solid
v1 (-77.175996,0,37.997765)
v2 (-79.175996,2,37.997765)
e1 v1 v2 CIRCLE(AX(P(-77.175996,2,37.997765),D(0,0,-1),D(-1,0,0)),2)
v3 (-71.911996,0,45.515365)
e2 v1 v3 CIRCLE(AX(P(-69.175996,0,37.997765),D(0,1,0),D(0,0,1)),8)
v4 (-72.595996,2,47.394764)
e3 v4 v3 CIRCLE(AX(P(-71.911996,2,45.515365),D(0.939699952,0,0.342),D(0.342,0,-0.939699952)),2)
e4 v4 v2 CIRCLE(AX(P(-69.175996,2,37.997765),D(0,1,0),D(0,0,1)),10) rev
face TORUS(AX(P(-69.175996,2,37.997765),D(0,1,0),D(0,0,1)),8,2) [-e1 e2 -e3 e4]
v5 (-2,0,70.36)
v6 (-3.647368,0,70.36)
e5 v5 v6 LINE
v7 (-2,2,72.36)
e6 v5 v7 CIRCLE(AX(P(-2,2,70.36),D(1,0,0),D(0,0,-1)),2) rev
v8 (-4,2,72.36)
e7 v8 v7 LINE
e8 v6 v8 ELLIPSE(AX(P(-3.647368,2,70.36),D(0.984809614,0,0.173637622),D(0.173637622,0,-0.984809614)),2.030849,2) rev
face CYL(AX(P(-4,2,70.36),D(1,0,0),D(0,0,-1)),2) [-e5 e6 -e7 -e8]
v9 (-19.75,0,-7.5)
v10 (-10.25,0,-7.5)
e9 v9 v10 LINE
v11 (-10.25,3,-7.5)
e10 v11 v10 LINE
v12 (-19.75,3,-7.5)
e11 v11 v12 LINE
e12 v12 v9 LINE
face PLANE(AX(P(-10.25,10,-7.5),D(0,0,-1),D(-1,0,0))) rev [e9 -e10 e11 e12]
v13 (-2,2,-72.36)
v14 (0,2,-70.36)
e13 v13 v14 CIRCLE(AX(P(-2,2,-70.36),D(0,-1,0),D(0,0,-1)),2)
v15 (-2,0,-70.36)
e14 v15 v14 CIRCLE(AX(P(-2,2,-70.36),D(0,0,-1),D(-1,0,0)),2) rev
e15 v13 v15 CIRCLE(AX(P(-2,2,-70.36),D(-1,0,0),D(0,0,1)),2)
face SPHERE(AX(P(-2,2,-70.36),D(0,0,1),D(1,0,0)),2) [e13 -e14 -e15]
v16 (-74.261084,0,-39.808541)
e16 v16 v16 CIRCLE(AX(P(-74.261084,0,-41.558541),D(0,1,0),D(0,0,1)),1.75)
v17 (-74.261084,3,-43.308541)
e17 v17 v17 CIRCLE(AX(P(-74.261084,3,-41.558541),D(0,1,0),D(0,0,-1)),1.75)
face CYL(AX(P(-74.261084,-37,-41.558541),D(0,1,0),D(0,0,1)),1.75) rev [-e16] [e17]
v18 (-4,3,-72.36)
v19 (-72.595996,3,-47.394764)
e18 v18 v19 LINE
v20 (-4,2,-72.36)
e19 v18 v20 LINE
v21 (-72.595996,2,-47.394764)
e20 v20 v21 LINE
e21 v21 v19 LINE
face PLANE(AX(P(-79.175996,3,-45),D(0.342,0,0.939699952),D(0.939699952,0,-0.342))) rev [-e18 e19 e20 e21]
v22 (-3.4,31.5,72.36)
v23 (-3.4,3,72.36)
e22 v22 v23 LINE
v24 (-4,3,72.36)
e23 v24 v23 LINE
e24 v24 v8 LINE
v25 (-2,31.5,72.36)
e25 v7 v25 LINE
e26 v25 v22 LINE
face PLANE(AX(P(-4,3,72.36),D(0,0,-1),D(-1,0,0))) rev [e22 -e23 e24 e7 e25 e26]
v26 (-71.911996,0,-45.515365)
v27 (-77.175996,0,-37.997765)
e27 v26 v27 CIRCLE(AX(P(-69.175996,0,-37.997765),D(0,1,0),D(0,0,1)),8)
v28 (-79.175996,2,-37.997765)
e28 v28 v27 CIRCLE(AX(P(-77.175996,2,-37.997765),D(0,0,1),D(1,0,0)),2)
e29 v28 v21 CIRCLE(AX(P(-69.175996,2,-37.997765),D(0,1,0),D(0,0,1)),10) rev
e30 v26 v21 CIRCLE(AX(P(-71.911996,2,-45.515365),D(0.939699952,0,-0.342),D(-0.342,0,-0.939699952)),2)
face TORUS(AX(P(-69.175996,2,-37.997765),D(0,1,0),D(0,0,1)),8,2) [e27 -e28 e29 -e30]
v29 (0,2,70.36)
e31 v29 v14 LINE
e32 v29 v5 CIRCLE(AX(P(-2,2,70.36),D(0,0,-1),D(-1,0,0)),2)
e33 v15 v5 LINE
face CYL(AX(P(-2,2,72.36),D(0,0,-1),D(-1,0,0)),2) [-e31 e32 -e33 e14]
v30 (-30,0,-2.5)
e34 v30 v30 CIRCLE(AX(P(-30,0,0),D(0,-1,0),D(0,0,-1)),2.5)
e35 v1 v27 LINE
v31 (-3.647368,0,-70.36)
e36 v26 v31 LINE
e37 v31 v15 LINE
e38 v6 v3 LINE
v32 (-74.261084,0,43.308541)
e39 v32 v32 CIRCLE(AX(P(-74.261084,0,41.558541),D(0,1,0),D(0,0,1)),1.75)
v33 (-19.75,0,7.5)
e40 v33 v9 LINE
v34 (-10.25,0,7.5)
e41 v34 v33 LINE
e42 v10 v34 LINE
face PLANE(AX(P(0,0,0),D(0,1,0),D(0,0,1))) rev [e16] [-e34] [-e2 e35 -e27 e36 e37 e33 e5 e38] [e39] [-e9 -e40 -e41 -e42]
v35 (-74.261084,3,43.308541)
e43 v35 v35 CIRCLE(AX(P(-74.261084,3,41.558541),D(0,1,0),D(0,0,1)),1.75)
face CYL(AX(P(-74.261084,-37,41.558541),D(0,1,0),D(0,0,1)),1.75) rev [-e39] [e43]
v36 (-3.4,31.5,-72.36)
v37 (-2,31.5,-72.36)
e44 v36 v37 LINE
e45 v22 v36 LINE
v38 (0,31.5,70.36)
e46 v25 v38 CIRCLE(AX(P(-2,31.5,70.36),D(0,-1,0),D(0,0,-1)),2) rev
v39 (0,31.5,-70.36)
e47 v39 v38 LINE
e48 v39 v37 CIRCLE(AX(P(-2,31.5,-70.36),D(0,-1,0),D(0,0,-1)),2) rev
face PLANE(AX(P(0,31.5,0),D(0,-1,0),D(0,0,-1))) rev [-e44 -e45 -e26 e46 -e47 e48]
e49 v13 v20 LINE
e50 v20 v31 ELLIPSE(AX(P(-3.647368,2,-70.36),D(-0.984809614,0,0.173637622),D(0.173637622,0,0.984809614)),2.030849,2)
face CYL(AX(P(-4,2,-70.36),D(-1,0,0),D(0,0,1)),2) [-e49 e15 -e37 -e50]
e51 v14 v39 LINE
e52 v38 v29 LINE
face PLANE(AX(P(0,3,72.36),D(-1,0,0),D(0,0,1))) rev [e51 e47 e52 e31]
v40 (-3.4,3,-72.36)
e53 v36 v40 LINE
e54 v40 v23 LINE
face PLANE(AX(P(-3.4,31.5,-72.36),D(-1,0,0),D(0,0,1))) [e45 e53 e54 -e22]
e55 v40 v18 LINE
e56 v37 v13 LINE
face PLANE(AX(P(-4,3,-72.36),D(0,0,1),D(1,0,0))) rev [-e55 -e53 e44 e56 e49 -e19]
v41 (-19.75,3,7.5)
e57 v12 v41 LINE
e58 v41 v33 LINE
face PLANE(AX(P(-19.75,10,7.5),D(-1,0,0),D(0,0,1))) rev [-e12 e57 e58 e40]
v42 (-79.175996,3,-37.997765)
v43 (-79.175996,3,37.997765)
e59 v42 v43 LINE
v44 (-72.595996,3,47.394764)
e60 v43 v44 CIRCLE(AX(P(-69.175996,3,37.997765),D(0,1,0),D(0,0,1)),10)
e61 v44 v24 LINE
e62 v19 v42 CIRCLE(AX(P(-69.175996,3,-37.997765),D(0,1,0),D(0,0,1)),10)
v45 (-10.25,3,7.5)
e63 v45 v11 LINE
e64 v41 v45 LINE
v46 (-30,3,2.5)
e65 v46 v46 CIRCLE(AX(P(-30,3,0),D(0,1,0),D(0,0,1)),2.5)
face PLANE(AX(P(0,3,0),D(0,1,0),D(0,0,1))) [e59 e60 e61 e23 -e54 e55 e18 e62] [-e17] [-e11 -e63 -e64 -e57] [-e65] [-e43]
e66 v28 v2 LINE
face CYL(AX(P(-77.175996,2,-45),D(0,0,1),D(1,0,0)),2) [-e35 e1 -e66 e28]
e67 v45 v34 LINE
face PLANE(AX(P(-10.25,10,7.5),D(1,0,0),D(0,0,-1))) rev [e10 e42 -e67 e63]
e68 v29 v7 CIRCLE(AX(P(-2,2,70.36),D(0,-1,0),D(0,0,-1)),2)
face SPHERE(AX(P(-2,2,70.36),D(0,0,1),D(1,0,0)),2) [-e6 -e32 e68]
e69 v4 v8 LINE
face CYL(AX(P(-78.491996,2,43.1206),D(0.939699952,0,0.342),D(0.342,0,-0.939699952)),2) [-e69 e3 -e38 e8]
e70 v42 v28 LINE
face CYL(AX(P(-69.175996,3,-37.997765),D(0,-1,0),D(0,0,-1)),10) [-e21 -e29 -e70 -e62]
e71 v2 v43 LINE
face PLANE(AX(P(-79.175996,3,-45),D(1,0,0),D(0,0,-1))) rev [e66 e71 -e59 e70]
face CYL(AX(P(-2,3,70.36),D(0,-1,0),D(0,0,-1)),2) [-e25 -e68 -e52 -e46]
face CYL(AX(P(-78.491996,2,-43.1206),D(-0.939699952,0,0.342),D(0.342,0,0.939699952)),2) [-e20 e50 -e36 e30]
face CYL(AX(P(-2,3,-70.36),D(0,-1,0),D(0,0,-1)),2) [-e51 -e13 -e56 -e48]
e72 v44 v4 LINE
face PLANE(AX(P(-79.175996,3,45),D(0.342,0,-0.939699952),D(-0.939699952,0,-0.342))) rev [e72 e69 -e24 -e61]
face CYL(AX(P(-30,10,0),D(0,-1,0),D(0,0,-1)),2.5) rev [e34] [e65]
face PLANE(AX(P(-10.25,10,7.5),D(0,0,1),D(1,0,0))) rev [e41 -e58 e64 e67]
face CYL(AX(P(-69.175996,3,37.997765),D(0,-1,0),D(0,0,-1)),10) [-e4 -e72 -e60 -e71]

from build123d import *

# Parameters (mm, degrees)
BOSS_EXTRUDE1_DEPTH     = 3
SKETCH2_W               = 3.3999999999999995
SKETCH2_H               = 144.72
BOSS_EXTRUDE2_DEPTH     = 31.5
SKETCH3_R               = 1.749999999999997
CUT_EXTRUDE1_DEPTH      = 40
FILLET1_R               = 2
FILLET2_R               = 2
CONG_1_R                = 10
ESQUISSE2_R             = 2.500000000000002
ENL_V_MAT_EXTRU_1_DEPTH = 10


with BuildPart() as part:
    # Sketch1 → Boss-Extrude1 (new body)
    with BuildSketch(Plane(origin=(0, 0, 0), x_dir=(1, 0, 0), z_dir=(0, 1, 0))):
        Polygon((-79.17599616899001, 45), (-79.17599616899001, -45), (-4, -72.36), (0, -72.36), (0, 72.36), (-4, 72.36), align=None)
    extrude(amount=BOSS_EXTRUDE1_DEPTH)

    # Sketch2 → Boss-Extrude2 (add)
    with BuildSketch(Plane.XZ):
        with Locations((-1.6999999999999997, 0)):
            Rectangle(SKETCH2_W, SKETCH2_H)
    extrude(amount=-BOSS_EXTRUDE2_DEPTH)

    # Sketch3 → Cut-Extrude1 (cut)
    with BuildSketch(Plane(origin=(0, 3, 0), x_dir=(1, 0, 0), z_dir=(0, 1, 0))):
        with Locations(Location((-74.2610839032561, -41.5585413818937, 0), (0, 0, 270))):
            Circle(SKETCH3_R)
        with Locations(Location((-74.26108390325611, 41.55854138189368, 0), (0, 0, 270))):
            Circle(SKETCH3_R)
    extrude(amount=-CUT_EXTRUDE1_DEPTH, mode=Mode.SUBTRACT)

    # Fillet1
    fillet1_edges = [part.edges().sort_by_distance(p)[0] for p in [
        (-2, 0, -72.36),
        (0, 0, 0),
        (-2, 0, 72.36),
        (-41.587998084495005, 0, 58.68),
        (-79.17599616899001, 0, 0),
        (-41.587998084495005, 0, -58.68),
    ]]
    fillet(fillet1_edges, radius=FILLET1_R)

    # Fillet2
    # the kernel refuses this fillet: 2 mm, written as the material it takes off along each edge
    with BuildSketch(Plane(origin=(-2, 2, -70.36), x_dir=(1, 0, 0), z_dir=(0, 0, -1))) as fillet2_piece_1_section:
        Polygon((0, 0), (FILLET2_R, 0), (FILLET2_R, FILLET2_R), (0, FILLET2_R), align=None)
    fillet2_piece_1 = extrude(amount=FILLET2_R, mode=Mode.PRIVATE)
    fillet2_piece_1 = fillet2_piece_1 - Plane(origin=(-2, 2, -70.36), x_dir=(-0.7071067811865475, 0.7071067811865475, 0), z_dir=(0, 0, -1)) * Sphere(FILLET2_R, mode=Mode.PRIVATE)
    add(fillet2_piece_1, mode=Mode.SUBTRACT)
    with BuildSketch(Plane(origin=(-2, 2, 70.36), x_dir=(1, 0, 0), z_dir=(0, 0, 1))) as fillet2_piece_2_section:
        Polygon((0, 0), (FILLET2_R, 0), (FILLET2_R, -FILLET2_R), (0, -FILLET2_R), align=None)
    fillet2_piece_2 = extrude(amount=FILLET2_R, mode=Mode.PRIVATE)
    fillet2_piece_2 = fillet2_piece_2 - Plane(origin=(-2, 2, 70.36), x_dir=(-0.7071067811865475, 0.7071067811865475, 0), z_dir=(0, 0, 1)) * Sphere(FILLET2_R, mode=Mode.PRIVATE)
    add(fillet2_piece_2, mode=Mode.SUBTRACT)
    with BuildSketch(Plane(origin=(0, 36.5, -72.36), x_dir=(-1, 0, 0), z_dir=(0, -1, 0))) as fillet2_piece_3:
        with BuildLine():
            CenterArc((FILLET2_R, -FILLET2_R), FILLET2_R, 90, 90)
            Line((-2.2e-16, -FILLET2_R), (0, 0))
            Line((0, 0), (FILLET2_R, 0))
        make_face()
    extrude(amount=34.5, mode=Mode.SUBTRACT)
    with BuildSketch(Plane(origin=(0, 1.9999999999999993, 72.36), x_dir=(-1, 0, 0), z_dir=(0, 1, 0))) as fillet2_piece_4:
        with BuildLine():
            CenterArc((FILLET2_R, -FILLET2_R), FILLET2_R, 90, 90)
            Line((0, -FILLET2_R), (0, 0))
            Line((0, 0), (FILLET2_R, 0))
        make_face()
    extrude(amount=34.5, mode=Mode.SUBTRACT)

    # Congé1
    # the kernel refuses this fillet: 10 mm, written as the material it takes off along each edge
    with BuildSketch(Plane(origin=(-69.17599616899001, 0, -37.99776488738916), x_dir=(-1, 0, 0), z_dir=(0, 0, 1))) as cong_1_piece_1:
        with BuildLine():
            CenterArc((8, -2), 2, 0, 90)
            Line((10, -2), (10, 0))
            Line((10, 0), (8, 0))
        make_face()
    revolve(axis=Axis((-69.17599616899001, 0, -37.99776488738916), (0, -1, 0)), revolution_arc=70.00122819209012, mode=Mode.SUBTRACT)
    with BuildSketch(Plane(origin=(-69.17599616899001, 0, 37.99776488738917), x_dir=(-0.34199999999999997, 0, 0.9396999521123751), z_dir=(0.9396999521123751, 0, 0.34199999999999997))) as cong_1_piece_2:
        with BuildLine():
            CenterArc((8, -2), 2, 0, 90)
            Line((10, -2), (10, 0))
            Line((10, 0), (8, 0))
        make_face()
    revolve(axis=Axis((-69.17599616899001, 0, 37.99776488738917), (0, -1, 0)), revolution_arc=70.00122819209012, mode=Mode.SUBTRACT)
    with BuildSketch(Plane(origin=(-79.17599616899001, -4.4e-16, 45), x_dir=(0, 0, -1), z_dir=(0, 1, 0))) as cong_1_piece_3:
        with BuildLine():
            CenterArc((CONG_1_R * 0.700223511261, -CONG_1_R), CONG_1_R, 90, 70.00122819209011)
            Line((-CONG_1_R * 0.239476440851, -CONG_1_R * 0.658), (0, 0))
            Line((0, 0), (CONG_1_R * 0.700223511261, 0))
        make_face()
    extrude(amount=20.505587781527105, mode=Mode.SUBTRACT)
    with BuildSketch(Plane(origin=(-79.17599616899001, -4.4e-16, -45), x_dir=(0, 0, 1), z_dir=(0, 1, 0))) as cong_1_piece_4:
        with BuildLine():
            CenterArc((CONG_1_R * 0.700223511261, CONG_1_R), CONG_1_R, 199.99877180790997, 70.00122819209003)
            Line((-CONG_1_R * 0.239476440851, CONG_1_R * 0.658), (0, 0))
            Line((0, 0), (CONG_1_R * 0.700223511261, 0))
        make_face()
    extrude(amount=20.5055877815271, mode=Mode.SUBTRACT)

    # Esquisse2 → Enlèv. mat.-Extru.1 (cut)
    with BuildSketch(Plane.XZ):
        with Locations(Location((-30, -3.67e-15, 0), (0, 0, 270))):
            Circle(ESQUISSE2_R)
        Polygon((-10.25, 7.499999999999999), (-19.75, 7.499999999999999), (-19.749999999999996, -7.500000000000002), (-10.249999999999998, -7.500000000000001), align=None)
    extrude(amount=-ENL_V_MAT_EXTRU_1_DEPTH, mode=Mode.SUBTRACT)


solid = part.part
